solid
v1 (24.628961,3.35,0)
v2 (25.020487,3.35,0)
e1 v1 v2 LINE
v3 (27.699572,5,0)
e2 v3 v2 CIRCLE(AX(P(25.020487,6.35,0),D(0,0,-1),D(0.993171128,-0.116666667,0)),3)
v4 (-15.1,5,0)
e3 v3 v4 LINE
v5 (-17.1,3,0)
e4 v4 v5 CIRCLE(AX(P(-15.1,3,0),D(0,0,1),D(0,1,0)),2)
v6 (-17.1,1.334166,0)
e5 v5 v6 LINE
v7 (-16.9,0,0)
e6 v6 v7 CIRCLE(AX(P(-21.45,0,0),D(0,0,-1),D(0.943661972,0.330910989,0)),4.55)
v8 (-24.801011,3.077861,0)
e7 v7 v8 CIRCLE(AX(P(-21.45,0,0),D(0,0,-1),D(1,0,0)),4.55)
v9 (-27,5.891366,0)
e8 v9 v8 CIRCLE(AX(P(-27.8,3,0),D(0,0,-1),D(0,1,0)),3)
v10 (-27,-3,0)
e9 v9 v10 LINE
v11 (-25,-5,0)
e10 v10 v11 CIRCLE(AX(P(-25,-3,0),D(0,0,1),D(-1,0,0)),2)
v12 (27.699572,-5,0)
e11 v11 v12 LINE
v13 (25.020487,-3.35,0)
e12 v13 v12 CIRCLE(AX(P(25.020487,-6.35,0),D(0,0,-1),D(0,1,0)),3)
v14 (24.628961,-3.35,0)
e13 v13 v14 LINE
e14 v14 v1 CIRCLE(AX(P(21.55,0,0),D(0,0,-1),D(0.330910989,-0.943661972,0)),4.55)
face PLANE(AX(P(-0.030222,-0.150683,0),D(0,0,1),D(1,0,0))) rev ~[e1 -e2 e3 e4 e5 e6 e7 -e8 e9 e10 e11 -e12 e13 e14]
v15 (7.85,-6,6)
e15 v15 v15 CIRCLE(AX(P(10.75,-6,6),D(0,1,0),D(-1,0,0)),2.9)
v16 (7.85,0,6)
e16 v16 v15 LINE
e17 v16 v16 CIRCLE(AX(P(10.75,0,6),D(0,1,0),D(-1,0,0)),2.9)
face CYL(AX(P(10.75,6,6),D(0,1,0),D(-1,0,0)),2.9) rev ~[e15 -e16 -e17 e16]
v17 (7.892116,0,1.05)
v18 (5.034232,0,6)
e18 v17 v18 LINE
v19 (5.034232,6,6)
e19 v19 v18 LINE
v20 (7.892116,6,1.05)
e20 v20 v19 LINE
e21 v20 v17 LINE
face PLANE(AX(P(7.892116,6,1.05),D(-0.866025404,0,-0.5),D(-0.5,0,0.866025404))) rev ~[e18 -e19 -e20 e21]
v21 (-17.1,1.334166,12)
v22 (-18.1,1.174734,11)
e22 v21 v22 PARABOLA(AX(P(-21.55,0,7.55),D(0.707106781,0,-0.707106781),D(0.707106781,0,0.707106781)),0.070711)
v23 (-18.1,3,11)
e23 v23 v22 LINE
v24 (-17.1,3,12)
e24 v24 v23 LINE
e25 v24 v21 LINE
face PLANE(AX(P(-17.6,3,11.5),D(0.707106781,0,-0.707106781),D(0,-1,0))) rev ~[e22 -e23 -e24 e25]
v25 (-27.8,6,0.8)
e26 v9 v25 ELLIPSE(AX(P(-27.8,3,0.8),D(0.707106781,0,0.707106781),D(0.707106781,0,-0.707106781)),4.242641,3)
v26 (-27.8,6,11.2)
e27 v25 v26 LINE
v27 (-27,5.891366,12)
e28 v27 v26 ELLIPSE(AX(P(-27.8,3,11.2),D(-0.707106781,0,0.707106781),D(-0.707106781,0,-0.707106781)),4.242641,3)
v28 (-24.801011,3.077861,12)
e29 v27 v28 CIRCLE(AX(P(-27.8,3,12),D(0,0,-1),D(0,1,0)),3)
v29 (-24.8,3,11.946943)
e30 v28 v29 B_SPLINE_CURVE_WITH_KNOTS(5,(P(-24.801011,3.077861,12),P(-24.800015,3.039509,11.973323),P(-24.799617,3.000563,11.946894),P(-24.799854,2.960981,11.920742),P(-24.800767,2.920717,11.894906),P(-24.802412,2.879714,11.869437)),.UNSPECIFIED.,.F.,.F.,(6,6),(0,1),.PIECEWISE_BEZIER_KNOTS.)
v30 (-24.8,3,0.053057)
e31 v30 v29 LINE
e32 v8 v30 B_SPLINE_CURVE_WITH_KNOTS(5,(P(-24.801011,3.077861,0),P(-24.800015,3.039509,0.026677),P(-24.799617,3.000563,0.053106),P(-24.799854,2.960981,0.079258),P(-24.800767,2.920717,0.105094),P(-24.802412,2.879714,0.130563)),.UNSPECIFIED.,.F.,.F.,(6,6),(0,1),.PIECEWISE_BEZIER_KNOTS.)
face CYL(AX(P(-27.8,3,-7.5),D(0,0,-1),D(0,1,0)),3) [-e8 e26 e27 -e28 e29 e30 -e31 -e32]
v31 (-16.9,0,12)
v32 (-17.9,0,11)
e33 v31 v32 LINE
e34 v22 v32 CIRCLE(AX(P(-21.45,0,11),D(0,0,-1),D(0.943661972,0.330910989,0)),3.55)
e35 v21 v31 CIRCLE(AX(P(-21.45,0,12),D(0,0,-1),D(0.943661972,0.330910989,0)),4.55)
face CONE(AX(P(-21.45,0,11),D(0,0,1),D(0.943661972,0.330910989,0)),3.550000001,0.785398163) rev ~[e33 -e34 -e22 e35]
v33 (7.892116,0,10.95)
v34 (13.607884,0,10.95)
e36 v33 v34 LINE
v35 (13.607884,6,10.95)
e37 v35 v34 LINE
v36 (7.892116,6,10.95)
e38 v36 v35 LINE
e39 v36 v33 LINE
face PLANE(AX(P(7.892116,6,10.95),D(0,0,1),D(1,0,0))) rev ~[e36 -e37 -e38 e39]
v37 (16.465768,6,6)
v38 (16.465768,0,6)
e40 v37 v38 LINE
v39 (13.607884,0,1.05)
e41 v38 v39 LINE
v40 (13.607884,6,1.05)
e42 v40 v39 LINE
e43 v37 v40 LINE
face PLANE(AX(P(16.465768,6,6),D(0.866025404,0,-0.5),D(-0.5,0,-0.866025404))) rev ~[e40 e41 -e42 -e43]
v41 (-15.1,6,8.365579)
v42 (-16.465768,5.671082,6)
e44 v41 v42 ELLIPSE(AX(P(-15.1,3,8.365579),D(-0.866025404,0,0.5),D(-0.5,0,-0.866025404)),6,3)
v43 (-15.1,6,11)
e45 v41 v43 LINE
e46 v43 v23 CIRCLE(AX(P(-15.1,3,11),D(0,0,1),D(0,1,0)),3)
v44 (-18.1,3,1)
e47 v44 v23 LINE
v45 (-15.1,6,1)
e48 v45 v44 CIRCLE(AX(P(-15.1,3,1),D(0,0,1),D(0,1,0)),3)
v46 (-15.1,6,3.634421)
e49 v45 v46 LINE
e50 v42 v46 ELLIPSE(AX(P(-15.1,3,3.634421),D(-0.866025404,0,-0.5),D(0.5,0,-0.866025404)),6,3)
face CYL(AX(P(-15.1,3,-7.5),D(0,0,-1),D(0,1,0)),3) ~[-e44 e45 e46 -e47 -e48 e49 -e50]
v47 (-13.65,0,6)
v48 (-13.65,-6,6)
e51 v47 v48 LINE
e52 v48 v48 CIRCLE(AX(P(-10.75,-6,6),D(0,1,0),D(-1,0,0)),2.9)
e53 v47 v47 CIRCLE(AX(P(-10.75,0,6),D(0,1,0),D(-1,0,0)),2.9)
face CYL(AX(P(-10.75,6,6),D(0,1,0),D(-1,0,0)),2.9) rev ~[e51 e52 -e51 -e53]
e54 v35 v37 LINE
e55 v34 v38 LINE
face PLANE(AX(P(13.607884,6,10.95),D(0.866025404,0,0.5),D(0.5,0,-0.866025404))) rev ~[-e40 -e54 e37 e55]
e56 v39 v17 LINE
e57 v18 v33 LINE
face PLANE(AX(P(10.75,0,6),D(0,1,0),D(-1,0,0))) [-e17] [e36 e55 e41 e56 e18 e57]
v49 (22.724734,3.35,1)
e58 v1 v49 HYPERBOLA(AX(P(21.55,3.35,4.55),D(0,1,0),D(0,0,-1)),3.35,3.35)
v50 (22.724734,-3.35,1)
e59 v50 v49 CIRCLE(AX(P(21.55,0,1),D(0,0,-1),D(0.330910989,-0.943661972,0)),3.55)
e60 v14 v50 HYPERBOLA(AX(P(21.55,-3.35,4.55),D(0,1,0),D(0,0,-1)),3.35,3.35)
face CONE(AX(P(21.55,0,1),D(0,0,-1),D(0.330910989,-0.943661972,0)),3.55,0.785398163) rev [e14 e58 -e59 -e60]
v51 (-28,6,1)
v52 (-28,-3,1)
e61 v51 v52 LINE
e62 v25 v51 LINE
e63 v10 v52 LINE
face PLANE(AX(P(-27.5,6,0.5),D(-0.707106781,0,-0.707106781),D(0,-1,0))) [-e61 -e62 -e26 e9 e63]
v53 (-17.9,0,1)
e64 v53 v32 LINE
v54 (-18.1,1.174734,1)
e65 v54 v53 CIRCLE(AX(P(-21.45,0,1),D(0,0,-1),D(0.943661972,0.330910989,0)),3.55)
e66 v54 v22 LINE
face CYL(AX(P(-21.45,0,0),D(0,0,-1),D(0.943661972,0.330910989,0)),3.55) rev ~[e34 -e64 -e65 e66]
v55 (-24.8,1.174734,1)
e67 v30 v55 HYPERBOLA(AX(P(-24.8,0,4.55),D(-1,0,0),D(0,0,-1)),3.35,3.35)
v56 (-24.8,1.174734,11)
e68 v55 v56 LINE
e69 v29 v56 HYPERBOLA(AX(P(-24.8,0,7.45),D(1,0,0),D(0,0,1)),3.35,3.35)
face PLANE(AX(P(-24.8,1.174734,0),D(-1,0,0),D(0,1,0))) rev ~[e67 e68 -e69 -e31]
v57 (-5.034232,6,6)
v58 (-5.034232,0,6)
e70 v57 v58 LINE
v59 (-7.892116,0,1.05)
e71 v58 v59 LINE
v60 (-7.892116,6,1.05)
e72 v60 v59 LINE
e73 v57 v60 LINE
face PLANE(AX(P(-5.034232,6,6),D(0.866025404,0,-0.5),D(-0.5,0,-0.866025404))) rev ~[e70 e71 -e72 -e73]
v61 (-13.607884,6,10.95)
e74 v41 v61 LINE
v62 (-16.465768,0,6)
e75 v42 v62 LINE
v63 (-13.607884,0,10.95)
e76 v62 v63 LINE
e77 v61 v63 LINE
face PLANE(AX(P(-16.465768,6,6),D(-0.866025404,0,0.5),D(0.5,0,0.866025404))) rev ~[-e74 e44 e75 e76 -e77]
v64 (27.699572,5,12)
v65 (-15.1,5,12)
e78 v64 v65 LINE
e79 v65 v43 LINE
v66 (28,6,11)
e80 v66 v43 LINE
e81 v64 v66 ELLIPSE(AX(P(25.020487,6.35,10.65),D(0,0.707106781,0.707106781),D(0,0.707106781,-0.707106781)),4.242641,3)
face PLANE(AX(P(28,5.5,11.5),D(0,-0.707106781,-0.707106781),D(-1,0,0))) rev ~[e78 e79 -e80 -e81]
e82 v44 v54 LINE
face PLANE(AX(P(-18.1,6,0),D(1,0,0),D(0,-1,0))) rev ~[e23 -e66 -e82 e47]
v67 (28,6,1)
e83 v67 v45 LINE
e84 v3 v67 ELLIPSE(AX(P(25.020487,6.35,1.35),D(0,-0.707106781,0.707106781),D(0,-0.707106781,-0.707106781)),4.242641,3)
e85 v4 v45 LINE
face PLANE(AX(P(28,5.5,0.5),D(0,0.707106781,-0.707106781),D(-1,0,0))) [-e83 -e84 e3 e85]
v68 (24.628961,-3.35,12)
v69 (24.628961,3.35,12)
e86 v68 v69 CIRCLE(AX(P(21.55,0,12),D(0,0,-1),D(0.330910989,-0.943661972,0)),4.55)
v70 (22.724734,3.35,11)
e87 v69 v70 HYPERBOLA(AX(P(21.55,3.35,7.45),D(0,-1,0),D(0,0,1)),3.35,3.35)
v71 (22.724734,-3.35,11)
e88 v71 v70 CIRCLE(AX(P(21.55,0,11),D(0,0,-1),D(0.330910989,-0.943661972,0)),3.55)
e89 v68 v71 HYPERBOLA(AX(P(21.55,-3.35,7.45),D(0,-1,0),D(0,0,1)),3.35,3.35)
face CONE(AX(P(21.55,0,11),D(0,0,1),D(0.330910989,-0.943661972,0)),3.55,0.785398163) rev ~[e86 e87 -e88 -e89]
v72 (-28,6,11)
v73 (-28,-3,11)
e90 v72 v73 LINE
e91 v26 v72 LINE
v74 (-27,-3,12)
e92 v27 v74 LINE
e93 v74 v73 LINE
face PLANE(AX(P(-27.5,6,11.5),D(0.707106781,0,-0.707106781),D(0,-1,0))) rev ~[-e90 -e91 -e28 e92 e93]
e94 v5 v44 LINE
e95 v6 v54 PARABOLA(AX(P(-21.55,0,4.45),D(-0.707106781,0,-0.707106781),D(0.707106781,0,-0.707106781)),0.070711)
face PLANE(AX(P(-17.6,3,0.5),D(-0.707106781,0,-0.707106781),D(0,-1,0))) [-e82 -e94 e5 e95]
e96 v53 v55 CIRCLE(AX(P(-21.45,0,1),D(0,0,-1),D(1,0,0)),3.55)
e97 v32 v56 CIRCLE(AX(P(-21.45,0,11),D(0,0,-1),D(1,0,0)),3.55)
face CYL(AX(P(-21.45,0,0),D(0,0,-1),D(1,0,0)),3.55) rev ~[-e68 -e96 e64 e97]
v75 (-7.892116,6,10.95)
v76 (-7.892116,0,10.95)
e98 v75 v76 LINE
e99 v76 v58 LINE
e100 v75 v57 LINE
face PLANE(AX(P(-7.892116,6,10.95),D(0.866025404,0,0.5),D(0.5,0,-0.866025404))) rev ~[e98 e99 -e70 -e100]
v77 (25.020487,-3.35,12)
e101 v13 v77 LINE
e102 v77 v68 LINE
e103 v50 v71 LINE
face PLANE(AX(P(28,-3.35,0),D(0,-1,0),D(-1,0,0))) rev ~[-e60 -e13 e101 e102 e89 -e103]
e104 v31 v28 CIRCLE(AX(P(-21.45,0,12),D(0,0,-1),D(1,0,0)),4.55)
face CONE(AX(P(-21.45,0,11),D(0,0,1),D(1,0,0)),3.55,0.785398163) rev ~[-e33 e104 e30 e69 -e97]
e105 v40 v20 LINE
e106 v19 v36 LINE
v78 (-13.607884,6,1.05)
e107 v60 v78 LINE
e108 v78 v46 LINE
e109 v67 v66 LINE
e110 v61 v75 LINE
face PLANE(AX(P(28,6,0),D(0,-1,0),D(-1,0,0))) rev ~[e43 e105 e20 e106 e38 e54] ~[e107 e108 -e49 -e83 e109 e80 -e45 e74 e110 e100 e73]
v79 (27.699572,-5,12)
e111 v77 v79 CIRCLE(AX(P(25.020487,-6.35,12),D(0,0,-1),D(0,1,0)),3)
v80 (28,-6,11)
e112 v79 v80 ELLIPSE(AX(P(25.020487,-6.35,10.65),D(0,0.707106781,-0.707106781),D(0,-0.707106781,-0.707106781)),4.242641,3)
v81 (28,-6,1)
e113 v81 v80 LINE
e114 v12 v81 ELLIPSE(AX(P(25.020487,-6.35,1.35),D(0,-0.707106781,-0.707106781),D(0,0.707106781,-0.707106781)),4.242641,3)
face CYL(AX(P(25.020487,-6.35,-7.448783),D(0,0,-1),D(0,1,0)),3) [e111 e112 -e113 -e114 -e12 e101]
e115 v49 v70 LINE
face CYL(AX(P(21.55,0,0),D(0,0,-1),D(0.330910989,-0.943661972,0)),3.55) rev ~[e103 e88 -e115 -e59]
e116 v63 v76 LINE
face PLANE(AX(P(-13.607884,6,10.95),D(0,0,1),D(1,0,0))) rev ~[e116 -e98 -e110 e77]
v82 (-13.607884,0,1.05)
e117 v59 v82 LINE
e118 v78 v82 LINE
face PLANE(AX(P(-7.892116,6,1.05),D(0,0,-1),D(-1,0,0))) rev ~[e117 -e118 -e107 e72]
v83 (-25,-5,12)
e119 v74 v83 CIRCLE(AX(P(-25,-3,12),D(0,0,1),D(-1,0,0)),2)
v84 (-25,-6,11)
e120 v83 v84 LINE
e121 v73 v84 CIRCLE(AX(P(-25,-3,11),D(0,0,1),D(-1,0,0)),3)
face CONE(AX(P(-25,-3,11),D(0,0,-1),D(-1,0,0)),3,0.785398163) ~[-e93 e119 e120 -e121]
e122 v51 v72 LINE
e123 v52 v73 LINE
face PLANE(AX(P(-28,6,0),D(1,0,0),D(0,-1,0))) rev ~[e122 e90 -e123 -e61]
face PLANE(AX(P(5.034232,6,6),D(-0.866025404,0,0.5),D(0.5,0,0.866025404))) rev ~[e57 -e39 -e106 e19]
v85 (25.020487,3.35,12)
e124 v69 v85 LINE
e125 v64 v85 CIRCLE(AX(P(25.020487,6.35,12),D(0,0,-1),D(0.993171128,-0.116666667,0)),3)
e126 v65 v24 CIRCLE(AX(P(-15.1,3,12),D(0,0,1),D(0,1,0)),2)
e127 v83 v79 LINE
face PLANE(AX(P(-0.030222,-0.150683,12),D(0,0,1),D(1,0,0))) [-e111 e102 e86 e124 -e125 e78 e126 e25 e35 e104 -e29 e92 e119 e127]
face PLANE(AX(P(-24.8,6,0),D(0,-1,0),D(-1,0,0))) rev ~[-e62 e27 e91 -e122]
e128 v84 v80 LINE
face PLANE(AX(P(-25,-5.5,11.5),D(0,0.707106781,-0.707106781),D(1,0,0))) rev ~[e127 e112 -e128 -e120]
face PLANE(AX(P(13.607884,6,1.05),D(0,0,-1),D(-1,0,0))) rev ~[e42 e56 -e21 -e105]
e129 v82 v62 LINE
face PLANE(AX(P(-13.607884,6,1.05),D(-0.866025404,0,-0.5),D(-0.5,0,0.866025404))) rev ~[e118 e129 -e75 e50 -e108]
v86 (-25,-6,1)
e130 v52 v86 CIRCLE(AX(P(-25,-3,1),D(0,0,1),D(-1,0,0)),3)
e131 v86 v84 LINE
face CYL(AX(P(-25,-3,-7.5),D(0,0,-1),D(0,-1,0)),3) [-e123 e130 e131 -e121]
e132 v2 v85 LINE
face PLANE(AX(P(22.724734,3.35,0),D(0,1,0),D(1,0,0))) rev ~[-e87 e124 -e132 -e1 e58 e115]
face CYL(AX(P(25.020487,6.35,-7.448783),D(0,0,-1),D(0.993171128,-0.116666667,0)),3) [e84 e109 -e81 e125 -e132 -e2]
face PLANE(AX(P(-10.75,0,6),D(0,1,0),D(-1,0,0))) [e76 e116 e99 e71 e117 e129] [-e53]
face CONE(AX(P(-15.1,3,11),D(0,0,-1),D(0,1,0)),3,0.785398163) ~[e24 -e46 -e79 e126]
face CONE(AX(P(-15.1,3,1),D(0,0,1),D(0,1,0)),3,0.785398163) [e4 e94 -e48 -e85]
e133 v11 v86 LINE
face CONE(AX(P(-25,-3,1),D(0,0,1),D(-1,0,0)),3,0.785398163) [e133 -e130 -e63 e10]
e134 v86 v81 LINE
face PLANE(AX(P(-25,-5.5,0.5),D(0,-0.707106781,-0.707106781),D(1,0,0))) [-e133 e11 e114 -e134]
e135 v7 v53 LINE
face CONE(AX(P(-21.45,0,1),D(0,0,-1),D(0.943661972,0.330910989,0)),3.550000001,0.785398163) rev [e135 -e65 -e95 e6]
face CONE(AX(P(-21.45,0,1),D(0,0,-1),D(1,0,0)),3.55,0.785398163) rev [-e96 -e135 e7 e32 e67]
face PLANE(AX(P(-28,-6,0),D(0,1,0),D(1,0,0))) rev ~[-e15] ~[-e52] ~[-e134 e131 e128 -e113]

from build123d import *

# Parameters (mm, degrees)
F1_DEPTH    = 12
F3_T1_DEPTH = 27
F3_T3_DEPTH = 26.8975669154
F4_SIZE     = 1
F2_R        = 2.9
F5_DEPTH    = 12.001
F6_DEPTH    = 6


# Not quite as in the source:
# - a fillet or chamfer that OpenCascade refuses, or shapes differently, is made with other operations: its cross-section is extruded or revolved along the edge and cut away or added


with BuildPart() as f1:
    # F0 (on Top) → F1 (new body)
    with BuildSketch(Plane.XY):
        with BuildLine():
            Line((-24.8, 6), (-28, 6))
            Line((-28, 6), (-28, -6))
            Line((-28, -6), (28, -6))
            Line((28, -6), (28, -3.35))
            Line((28, -3.35), (22.7247340124, -3.35))
            ThreePointArc((22.7247340124, -3.35), (18, 0), (22.7247340124, 3.35))
            Line((22.7247340124, 3.35), (28, 3.35))
            Line((28, 3.35), (28, 6))
            Line((28, 6), (-18.1, 6))
            Line((-18.1, 6), (-18.1, 1.1747340124))
            ThreePointArc((-18.1, 1.1747340124), (-17.9503571611, 0.5958187644), (-17.9, 0))
            ThreePointArc((-17.9, 0), (-22.0458187644, -3.4996428389), (-24.8, 1.1747340124))
            Line((-24.8, 1.1747340124), (-24.8, 6))
        make_face()
    extrude(amount=F1_DEPTH)

    # F3: fillet of radius 3 on 5 edges, made by hand

    # F3_s2 → F3_t1 (cut)
    with BuildSketch(Plane.XY.offset(-7.5)):
        with BuildLine():
            ThreePointArc((-15.1, 6), (-17.2213203436, 5.1213203436), (-18.1, 3))
            Line((-18.1, 3), (-18.1, 6))
            Line((-18.1, 6), (-15.1, 6))
        make_face()
        with BuildLine():
            ThreePointArc((-27.8, 6), (-25.6786796564, 5.1213203436), (-24.8, 3))
            Line((-24.8, 3), (-24.8, 6))
            Line((-24.8, 6), (-27.8, 6))
        make_face()
        with BuildLine():
            ThreePointArc((-25, -6), (-27.1213203436, -5.1213203436), (-28, -3))
            Line((-28, -3), (-28, -6))
            Line((-28, -6), (-25, -6))
        make_face()
    extrude(amount=F3_T1_DEPTH, mode=Mode.SUBTRACT)

    # F3_s4 → F3_t3 (cut)
    with BuildSketch(Plane.XY.offset(-7.4487834577)):
        with BuildLine():
            ThreePointArc((25.0204866169, -3.35), (27.0142268206, -4.1083488229), (28, -6))
            Line((28, -6), (28, -3.35))
            Line((28, -3.35), (25.0204866169, -3.35))
        make_face()
        with BuildLine():
            ThreePointArc((28, 6), (27.0142268206, 4.1083488229), (25.0204866169, 3.35))
            Line((25.0204866169, 3.35), (28, 3.35))
            Line((28, 3.35), (28, 6))
        make_face()
    extrude(amount=F3_T3_DEPTH, mode=Mode.SUBTRACT)

    # F4
    f4_edges = [f1.edges().sort_by_distance(p)[0] for p in [
        (1.5, -6, 12),
        (1.5, -6, 0),
        (18, 0, 12),
        (-21.45, -3.55, 12),
        (18, 0, 0),
        (-21.45, -3.55, 0),
        (6.45, 6, 0),
        (6.45, 6, 12),
        (-18.1, 2.087367, 0),
        (-17.22132, 5.12132, 0),
        (-27.12132, -5.12132, 0),
        (-28, 1.5, 0),
        (-18.1, 2.087367, 12),
        (-17.22132, 5.12132, 12),
        (-27.12132, -5.12132, 12),
        (-28, 1.5, 12),
    ]]
    chamfer(f4_edges, length=F4_SIZE)

    # F2 (on face) → F5 (cut, through all)
    with BuildSketch(Plane(origin=(0, 6, 0), x_dir=(-1, 0, 0), z_dir=(0, 1, 0))):
        with Locations((-10.75, 6)):
            Circle(F2_R)
        with Locations((10.75, 6)):
            Circle(F2_R)
    extrude(amount=-F5_DEPTH, mode=Mode.SUBTRACT)

    # F2 (on face) → F6 (cut)
    with BuildSketch(Plane(origin=(0, 6, 0), x_dir=(-1, 0, 0), z_dir=(0, 1, 0))):
        Polygon((-7.8921161675, 10.95), (-13.6078838325, 10.95), (-16.465767665, 6), (-13.6078838325, 1.05), (-7.8921161675, 1.05), (-5.034232335, 6), align=None)
        with Locations((-10.75, 6)):
            Circle(F2_R, mode=Mode.SUBTRACT)
        Polygon((13.6078838325, 10.95), (7.8921161675, 10.95), (5.034232335, 6), (7.8921161675, 1.05), (13.6078838325, 1.05), (16.465767665, 6), align=None)
        with Locations((10.75, 6)):
            Circle(F2_R, mode=Mode.SUBTRACT)
    extrude(amount=-F6_DEPTH, mode=Mode.SUBTRACT)


solid = f1.part
